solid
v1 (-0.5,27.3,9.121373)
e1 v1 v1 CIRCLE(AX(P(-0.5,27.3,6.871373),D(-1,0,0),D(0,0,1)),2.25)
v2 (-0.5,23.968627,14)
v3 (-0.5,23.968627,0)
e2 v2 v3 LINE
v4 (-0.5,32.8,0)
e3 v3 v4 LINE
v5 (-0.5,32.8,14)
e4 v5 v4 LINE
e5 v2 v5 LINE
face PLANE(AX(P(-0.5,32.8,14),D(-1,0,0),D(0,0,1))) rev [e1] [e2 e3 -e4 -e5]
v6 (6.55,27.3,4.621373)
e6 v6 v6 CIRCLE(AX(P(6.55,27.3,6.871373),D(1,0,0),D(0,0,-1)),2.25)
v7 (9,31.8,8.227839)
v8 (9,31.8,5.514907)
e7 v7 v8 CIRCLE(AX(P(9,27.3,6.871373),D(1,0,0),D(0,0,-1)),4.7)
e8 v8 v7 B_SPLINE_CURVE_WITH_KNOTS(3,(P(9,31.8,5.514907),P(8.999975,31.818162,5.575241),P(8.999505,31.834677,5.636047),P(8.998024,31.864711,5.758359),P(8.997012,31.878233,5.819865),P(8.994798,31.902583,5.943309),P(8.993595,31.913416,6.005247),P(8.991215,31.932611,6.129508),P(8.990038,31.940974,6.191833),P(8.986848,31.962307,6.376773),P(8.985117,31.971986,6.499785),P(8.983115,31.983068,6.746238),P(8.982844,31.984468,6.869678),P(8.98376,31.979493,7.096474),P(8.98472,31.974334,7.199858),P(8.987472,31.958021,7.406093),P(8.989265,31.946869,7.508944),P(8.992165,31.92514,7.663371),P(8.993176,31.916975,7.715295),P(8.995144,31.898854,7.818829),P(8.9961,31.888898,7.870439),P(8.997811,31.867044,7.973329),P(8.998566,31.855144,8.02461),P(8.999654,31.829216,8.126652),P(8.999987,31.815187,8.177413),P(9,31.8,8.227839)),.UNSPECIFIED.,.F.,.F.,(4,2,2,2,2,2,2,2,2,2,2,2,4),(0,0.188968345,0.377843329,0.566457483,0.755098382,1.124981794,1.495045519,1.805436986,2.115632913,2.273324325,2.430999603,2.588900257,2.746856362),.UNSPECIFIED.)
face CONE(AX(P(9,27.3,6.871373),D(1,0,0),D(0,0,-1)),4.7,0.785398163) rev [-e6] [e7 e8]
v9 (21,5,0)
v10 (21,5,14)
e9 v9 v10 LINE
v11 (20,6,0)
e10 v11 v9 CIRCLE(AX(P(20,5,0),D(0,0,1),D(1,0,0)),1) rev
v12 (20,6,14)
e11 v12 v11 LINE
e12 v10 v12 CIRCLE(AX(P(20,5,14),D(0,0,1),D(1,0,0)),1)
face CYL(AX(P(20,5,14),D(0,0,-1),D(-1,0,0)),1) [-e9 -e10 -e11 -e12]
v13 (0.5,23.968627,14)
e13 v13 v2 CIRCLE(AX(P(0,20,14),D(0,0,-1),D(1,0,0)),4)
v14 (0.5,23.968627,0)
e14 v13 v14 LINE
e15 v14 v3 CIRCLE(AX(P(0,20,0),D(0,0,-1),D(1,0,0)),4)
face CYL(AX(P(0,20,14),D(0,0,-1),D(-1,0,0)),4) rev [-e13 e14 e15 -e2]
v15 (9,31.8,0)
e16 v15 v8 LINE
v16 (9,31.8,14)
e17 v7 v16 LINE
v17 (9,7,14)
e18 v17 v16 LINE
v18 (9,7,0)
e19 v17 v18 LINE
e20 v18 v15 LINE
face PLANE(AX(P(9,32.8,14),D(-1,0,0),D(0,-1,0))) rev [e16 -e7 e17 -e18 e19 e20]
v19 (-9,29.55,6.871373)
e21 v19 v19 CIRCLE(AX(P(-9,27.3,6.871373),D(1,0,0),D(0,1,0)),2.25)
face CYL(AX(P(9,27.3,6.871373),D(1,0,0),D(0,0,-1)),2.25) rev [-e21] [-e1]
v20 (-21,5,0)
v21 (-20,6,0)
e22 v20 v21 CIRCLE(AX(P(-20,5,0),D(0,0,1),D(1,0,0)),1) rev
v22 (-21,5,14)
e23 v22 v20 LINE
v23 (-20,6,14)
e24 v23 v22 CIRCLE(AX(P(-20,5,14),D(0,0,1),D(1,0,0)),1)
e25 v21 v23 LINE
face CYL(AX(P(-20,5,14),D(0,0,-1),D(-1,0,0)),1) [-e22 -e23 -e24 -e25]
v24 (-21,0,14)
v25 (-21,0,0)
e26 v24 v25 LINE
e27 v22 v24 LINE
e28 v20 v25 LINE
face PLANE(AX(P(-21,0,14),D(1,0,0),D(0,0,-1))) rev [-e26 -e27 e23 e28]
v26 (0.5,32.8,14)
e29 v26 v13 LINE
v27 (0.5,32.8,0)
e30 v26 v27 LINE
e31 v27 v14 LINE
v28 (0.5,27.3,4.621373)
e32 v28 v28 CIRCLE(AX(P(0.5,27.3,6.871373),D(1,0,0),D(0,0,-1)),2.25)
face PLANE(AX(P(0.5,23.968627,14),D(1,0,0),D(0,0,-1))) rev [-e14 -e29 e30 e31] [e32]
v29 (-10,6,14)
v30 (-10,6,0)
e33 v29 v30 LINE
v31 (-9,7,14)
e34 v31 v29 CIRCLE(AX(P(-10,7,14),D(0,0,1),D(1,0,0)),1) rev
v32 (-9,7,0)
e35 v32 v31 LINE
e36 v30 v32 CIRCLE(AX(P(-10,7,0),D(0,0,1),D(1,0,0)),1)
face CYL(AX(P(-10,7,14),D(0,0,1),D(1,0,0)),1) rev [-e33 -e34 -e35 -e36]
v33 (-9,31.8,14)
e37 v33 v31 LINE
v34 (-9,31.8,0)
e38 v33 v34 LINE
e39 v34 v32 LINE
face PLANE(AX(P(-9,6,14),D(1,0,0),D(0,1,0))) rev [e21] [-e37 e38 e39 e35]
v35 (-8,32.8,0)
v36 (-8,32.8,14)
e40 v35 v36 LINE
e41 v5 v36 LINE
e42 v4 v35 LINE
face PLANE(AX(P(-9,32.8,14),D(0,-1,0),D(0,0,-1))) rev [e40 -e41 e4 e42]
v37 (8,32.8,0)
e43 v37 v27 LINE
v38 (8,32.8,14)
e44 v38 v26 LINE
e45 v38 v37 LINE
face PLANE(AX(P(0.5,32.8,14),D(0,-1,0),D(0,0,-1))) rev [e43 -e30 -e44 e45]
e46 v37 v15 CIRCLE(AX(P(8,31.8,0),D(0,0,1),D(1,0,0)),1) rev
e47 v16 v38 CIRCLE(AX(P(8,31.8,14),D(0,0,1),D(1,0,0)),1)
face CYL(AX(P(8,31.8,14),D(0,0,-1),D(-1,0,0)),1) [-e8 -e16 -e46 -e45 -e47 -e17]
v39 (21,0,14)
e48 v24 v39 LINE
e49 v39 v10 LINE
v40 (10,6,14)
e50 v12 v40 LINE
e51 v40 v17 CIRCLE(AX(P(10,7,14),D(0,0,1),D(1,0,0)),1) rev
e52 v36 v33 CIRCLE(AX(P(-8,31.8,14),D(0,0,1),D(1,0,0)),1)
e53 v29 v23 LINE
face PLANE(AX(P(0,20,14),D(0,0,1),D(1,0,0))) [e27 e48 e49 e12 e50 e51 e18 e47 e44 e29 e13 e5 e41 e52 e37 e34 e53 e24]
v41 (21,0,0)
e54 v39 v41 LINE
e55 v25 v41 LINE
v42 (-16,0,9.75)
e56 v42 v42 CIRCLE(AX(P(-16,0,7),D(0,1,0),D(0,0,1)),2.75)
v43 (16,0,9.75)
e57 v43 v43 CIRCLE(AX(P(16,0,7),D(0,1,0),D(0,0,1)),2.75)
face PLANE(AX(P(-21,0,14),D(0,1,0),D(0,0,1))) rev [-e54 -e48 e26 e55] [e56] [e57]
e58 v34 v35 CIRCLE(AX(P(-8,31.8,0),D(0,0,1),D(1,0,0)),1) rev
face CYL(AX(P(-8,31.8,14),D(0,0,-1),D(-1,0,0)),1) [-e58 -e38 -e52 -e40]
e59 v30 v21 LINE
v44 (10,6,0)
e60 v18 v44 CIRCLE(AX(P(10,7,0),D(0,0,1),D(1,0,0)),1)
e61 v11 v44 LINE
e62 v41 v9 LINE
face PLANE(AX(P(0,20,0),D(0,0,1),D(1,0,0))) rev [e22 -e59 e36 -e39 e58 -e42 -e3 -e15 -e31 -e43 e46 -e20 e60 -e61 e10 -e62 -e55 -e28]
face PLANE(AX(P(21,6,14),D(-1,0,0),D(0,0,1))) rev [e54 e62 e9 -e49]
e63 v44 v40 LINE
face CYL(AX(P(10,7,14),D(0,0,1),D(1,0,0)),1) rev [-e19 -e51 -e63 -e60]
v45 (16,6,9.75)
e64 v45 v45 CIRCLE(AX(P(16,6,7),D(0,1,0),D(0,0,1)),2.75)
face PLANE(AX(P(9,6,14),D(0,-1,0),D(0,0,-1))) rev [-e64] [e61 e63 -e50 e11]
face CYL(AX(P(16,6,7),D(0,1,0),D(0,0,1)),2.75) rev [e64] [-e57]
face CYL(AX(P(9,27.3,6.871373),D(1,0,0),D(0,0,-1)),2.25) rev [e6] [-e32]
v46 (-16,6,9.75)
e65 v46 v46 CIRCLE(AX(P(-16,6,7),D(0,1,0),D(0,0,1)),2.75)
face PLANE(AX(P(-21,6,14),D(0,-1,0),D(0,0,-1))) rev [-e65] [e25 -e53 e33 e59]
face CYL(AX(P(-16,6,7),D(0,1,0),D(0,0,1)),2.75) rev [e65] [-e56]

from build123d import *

# Parameters (mm, degrees)
BOSS_EXTRUDE1_DEPTH                             = 14
F_5_5_5_5_DIAMETER_HOLE1_D                      = 5.5
CSK_FOR_M4_FLAT_HEAD_MACHINE_SCREW1_D           = 4.5
CSK_FOR_M4_FLAT_HEAD_MACHINE_SCREW1_CSINK_D     = 9.4
CSK_FOR_M4_FLAT_HEAD_MACHINE_SCREW1_CSINK_ANGLE = 90
FILLET1_R                                       = 1


with BuildPart() as part:
    # Sketch1 → Boss-Extrude1 (new body)
    with BuildSketch(Plane.XY):
        with BuildLine():
            Line((-21, 0), (21, 0))
            Line((21, 0), (21, 6))
            Line((21, 6), (9, 6))
            Line((9, 6), (9, 32.8))
            Line((9, 32.8), (0.5, 32.8))
            Line((0.5, 32.8), (0.5, 23.968626967))
            ThreePointArc((0.5, 23.968626967), (0, 16), (-0.5, 23.968626967))
            Line((-0.5, 23.968626967), (-0.5, 32.8))
            Line((-0.5, 32.8), (-9, 32.8))
            Line((-9, 32.8), (-9, 6))
            Line((-9, 6), (-21, 6))
            Line((-21, 6), (-21, 0))
        make_face()
    extrude(amount=BOSS_EXTRUDE1_DEPTH)

    # Ø5.5 (5.5) Diameter Hole1 (through all)
    with Locations(Plane(origin=(-16, 6, 7), x_dir=(0, 0, 1), z_dir=(0, 1, 0))):
        with Locations((0, 0), (0, 32)):
            Hole(F_5_5_5_5_DIAMETER_HOLE1_D / 2)

    # CSK for M4 Flat Head Machine Screw1 (through all)
    with Locations(Plane(origin=(9, 27.3, 6.871372549), x_dir=(0, 1, 0), z_dir=(1, 0, 0))):
        with Locations((0, 0)):
            CounterSinkHole(CSK_FOR_M4_FLAT_HEAD_MACHINE_SCREW1_D / 2, CSK_FOR_M4_FLAT_HEAD_MACHINE_SCREW1_CSINK_D / 2, counter_sink_angle=CSK_FOR_M4_FLAT_HEAD_MACHINE_SCREW1_CSINK_ANGLE)

    # Fillet1
    # the kernel refuses this fillet: 1 mm, written as the material it adds along each edge
    with BuildSketch(Plane(origin=(-9, 6, 0), x_dir=(0, 1, 0), z_dir=(0, 0, 1)), Plane(origin=(9, 6, 0), x_dir=(1, 0, 0), z_dir=(0, 0, 1))) as fillet1_piece_1:
        with BuildLine():
            CenterArc((FILLET1_R, FILLET1_R), FILLET1_R, 180, 90)
            Line((0, FILLET1_R), (0, 0))
            Line((0, 0), (FILLET1_R, 0))
        make_face()
    extrude(amount=14)
    # the kernel refuses this fillet: 1 mm, written as the material it takes off along each edge
    with BuildSketch(Plane(origin=(-21, 6, -2.5), x_dir=(0, -1, 0), z_dir=(0, 0, 1))) as fillet1_2_piece_1:
        with BuildLine():
            CenterArc((FILLET1_R, FILLET1_R), FILLET1_R, 180, 90)
            Line((0, FILLET1_R), (0, 0))
            Line((0, 0), (FILLET1_R, 0))
        make_face()
    extrude(amount=19, mode=Mode.SUBTRACT)
    with BuildSketch(Plane(origin=(-9, 32.8, -2.5), x_dir=(1, 0, 0), z_dir=(0, 0, 1)), Plane(origin=(9, 32.8, -2.5), x_dir=(0, -1, 0), z_dir=(0, 0, 1)), Plane(origin=(21, 6, -2.5), x_dir=(0, -1, 0), z_dir=(0, 0, 1))) as fillet1_2_piece_2:
        with BuildLine():
            CenterArc((FILLET1_R, -FILLET1_R), FILLET1_R, 90, 90)
            Line((0, -FILLET1_R), (0, 0))
            Line((0, 0), (FILLET1_R, 0))
        make_face()
    extrude(amount=19, mode=Mode.SUBTRACT)


solid = part.part
